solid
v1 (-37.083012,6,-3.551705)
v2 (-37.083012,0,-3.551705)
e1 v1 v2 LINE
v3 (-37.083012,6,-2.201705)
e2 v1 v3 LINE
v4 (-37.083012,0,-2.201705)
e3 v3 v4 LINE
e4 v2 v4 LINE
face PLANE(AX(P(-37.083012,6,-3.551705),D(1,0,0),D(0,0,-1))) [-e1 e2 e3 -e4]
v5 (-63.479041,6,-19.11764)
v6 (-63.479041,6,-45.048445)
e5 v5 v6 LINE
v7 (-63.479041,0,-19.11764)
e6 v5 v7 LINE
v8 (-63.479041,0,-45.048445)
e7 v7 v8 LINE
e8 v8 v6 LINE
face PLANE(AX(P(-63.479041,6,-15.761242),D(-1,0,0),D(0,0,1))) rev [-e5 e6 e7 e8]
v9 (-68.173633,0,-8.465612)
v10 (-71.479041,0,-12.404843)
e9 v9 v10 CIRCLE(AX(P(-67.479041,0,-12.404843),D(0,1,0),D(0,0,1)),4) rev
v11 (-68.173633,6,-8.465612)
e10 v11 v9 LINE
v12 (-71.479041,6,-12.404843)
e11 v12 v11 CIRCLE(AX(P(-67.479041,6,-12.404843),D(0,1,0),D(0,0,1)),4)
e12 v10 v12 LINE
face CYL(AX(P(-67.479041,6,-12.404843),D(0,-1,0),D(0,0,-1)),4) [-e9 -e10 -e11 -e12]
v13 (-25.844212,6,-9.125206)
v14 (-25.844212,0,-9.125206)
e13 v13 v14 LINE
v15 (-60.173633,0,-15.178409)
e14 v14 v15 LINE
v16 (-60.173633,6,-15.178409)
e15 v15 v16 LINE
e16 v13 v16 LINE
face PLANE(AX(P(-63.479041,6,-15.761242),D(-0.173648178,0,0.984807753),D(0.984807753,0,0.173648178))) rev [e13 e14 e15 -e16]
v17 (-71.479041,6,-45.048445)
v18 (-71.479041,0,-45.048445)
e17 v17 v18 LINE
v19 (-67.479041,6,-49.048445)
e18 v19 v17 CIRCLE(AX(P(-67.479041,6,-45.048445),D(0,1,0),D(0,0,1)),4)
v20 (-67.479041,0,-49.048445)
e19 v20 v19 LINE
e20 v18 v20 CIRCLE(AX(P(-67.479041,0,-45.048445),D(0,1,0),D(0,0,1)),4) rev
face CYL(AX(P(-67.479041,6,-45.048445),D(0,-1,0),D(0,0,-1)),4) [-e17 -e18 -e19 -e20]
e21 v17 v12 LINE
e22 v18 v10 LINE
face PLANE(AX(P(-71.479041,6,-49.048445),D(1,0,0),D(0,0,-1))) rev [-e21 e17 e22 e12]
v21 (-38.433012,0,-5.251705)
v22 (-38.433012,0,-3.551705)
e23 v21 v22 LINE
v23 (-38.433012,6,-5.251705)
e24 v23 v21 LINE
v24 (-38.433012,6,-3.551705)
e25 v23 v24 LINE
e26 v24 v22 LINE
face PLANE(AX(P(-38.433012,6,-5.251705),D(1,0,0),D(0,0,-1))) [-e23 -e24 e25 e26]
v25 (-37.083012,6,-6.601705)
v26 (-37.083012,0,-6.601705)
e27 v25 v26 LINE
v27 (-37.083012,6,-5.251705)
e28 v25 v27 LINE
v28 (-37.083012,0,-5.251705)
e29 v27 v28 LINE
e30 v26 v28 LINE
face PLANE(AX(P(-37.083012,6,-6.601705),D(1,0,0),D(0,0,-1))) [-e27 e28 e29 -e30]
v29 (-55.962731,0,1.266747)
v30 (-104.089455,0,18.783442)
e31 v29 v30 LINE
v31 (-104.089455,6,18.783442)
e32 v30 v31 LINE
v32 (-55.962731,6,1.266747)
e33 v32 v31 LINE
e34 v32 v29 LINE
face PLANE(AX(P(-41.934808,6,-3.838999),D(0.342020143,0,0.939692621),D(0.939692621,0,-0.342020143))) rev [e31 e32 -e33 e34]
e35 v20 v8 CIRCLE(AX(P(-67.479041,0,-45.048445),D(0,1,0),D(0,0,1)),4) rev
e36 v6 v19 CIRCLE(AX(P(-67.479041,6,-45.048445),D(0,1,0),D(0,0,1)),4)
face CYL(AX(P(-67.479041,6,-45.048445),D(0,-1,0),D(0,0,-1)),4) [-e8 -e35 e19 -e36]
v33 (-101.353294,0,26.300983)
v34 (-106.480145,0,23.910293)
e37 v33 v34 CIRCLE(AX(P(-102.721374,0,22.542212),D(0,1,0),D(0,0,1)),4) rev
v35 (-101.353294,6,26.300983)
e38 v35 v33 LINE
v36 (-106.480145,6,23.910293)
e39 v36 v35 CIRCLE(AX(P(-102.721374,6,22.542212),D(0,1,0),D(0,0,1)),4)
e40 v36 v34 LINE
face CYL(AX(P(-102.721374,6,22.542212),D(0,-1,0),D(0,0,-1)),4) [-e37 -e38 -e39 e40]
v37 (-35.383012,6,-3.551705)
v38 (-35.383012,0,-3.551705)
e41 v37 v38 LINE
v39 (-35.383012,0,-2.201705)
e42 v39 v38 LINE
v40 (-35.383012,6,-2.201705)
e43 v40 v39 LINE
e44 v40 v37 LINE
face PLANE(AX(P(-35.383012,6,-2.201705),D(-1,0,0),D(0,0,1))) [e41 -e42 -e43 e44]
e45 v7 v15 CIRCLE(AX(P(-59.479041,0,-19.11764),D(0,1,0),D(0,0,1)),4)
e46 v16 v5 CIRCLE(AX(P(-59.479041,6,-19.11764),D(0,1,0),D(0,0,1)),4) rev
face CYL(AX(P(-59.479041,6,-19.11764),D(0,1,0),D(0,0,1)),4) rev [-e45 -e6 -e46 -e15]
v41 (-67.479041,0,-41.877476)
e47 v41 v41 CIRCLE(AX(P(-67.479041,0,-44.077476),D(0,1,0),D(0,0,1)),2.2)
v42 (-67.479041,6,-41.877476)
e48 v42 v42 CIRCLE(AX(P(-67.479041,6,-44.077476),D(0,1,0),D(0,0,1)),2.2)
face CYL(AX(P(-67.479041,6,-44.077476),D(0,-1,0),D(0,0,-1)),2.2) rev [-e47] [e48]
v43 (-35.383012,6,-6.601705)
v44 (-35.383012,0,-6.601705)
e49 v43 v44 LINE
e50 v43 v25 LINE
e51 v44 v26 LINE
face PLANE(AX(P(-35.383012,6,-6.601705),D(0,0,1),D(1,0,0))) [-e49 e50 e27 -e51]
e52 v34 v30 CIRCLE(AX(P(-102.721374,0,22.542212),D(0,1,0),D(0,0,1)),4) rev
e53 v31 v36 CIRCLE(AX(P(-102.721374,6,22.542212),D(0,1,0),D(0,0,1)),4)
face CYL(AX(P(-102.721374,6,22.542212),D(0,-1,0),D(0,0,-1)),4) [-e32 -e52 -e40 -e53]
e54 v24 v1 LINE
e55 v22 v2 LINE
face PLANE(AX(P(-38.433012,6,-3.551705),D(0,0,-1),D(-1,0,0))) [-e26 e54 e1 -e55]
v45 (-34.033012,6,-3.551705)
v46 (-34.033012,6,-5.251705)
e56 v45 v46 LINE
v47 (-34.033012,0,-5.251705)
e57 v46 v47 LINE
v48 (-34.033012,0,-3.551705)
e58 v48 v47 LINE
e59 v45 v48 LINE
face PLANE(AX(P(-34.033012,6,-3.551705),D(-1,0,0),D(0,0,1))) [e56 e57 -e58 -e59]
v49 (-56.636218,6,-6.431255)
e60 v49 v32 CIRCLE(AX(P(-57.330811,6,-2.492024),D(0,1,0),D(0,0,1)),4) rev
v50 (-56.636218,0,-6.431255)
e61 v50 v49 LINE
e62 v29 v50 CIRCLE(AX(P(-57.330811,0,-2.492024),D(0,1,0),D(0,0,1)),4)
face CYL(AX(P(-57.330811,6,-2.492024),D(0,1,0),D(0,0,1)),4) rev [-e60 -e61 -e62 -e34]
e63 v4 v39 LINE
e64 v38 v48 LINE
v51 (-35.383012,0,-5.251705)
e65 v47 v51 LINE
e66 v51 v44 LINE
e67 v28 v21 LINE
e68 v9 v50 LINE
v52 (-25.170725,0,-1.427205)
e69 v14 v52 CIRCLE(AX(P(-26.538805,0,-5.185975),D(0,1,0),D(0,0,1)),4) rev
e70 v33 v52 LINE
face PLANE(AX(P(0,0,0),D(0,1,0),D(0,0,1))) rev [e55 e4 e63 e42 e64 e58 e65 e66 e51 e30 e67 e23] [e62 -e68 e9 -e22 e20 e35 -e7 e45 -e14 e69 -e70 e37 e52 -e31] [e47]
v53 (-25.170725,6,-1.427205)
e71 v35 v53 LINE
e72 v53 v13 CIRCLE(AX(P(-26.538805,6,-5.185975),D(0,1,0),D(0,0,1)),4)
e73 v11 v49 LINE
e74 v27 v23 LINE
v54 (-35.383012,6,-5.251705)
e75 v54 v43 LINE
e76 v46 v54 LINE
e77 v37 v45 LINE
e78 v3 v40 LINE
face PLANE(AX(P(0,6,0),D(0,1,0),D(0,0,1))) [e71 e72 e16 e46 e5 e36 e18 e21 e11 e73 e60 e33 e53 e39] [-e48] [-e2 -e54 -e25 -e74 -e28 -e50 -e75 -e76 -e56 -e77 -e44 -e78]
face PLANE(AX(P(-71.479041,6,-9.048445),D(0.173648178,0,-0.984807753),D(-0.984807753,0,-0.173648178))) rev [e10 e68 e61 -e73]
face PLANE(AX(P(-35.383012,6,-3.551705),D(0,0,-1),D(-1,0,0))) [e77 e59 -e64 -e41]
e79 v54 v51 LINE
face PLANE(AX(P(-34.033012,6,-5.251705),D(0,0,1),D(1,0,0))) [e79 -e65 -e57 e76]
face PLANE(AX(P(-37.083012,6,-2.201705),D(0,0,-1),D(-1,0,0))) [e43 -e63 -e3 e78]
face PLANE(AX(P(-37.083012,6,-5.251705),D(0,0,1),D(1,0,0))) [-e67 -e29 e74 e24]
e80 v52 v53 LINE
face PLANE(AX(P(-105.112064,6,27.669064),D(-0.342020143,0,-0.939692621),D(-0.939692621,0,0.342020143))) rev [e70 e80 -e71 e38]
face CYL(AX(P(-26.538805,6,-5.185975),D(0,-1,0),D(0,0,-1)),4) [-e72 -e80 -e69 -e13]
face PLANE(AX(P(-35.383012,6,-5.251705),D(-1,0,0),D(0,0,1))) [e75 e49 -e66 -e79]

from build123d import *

# Parameters (mm, degrees)
SKETCH1_R           = 2.2
BOSS_EXTRUDE1_DEPTH = 6
FILLET1_R           = 4


with BuildPart() as part:
    # Sketch1 → Boss-Extrude1 (new body)
    with BuildSketch(Plane(origin=(0, 0, 0), x_dir=(1, 0, 0), z_dir=(0, 1, 0))):
        Polygon((-71.479040749, 49.048444694), (-71.479040749, 9.048444694), (-41.934808158, 3.838999364), (-107.848225403, -20.151522552), (-105.112064256, -27.669063518), (-11.142802178, 6.532950815), (-63.479040749, 15.761241744), (-63.479040749, 49.048444694), align=None)
        with Locations(Location((-67.479040749, 44.077475717, 0), (0, 0, 270))):
            Circle(SKETCH1_R, mode=Mode.SUBTRACT)
        Polygon((-38.433012349, 5.25170526), (-38.433012349, 3.55170526), (-37.083012349, 3.55170526), (-37.083012349, 2.20170526), (-35.383012349, 2.20170526), (-35.383012349, 3.55170526), (-34.033012349, 3.55170526), (-34.033012349, 5.25170526), (-35.383012349, 5.25170526), (-35.383012349, 6.60170526), (-37.083012349, 6.60170526), (-37.083012349, 5.25170526), align=None, mode=Mode.SUBTRACT)
    extrude(amount=BOSS_EXTRUDE1_DEPTH)

    # Fillet1
    fillet1_edges = [part.edges().sort_by_distance(p)[0] for p in [
        (-63.479040749, 3, -15.761241744),
        (-71.479040749, 3, -9.048444694),
        (-105.112064256, 3, 27.669063518),
        (-107.848225403, 3, 20.151522552),
        (-41.934808158, 3, -3.838999364),
        (-11.142802178, 3, -6.532950815),
        (-63.479040749, 3, -49.048444694),
        (-71.479040749, 3, -49.048444694),
    ]]
    fillet(fillet1_edges, radius=FILLET1_R - 0.0001)  # a hair under: the kernel refuses the full size


solid = part.part
